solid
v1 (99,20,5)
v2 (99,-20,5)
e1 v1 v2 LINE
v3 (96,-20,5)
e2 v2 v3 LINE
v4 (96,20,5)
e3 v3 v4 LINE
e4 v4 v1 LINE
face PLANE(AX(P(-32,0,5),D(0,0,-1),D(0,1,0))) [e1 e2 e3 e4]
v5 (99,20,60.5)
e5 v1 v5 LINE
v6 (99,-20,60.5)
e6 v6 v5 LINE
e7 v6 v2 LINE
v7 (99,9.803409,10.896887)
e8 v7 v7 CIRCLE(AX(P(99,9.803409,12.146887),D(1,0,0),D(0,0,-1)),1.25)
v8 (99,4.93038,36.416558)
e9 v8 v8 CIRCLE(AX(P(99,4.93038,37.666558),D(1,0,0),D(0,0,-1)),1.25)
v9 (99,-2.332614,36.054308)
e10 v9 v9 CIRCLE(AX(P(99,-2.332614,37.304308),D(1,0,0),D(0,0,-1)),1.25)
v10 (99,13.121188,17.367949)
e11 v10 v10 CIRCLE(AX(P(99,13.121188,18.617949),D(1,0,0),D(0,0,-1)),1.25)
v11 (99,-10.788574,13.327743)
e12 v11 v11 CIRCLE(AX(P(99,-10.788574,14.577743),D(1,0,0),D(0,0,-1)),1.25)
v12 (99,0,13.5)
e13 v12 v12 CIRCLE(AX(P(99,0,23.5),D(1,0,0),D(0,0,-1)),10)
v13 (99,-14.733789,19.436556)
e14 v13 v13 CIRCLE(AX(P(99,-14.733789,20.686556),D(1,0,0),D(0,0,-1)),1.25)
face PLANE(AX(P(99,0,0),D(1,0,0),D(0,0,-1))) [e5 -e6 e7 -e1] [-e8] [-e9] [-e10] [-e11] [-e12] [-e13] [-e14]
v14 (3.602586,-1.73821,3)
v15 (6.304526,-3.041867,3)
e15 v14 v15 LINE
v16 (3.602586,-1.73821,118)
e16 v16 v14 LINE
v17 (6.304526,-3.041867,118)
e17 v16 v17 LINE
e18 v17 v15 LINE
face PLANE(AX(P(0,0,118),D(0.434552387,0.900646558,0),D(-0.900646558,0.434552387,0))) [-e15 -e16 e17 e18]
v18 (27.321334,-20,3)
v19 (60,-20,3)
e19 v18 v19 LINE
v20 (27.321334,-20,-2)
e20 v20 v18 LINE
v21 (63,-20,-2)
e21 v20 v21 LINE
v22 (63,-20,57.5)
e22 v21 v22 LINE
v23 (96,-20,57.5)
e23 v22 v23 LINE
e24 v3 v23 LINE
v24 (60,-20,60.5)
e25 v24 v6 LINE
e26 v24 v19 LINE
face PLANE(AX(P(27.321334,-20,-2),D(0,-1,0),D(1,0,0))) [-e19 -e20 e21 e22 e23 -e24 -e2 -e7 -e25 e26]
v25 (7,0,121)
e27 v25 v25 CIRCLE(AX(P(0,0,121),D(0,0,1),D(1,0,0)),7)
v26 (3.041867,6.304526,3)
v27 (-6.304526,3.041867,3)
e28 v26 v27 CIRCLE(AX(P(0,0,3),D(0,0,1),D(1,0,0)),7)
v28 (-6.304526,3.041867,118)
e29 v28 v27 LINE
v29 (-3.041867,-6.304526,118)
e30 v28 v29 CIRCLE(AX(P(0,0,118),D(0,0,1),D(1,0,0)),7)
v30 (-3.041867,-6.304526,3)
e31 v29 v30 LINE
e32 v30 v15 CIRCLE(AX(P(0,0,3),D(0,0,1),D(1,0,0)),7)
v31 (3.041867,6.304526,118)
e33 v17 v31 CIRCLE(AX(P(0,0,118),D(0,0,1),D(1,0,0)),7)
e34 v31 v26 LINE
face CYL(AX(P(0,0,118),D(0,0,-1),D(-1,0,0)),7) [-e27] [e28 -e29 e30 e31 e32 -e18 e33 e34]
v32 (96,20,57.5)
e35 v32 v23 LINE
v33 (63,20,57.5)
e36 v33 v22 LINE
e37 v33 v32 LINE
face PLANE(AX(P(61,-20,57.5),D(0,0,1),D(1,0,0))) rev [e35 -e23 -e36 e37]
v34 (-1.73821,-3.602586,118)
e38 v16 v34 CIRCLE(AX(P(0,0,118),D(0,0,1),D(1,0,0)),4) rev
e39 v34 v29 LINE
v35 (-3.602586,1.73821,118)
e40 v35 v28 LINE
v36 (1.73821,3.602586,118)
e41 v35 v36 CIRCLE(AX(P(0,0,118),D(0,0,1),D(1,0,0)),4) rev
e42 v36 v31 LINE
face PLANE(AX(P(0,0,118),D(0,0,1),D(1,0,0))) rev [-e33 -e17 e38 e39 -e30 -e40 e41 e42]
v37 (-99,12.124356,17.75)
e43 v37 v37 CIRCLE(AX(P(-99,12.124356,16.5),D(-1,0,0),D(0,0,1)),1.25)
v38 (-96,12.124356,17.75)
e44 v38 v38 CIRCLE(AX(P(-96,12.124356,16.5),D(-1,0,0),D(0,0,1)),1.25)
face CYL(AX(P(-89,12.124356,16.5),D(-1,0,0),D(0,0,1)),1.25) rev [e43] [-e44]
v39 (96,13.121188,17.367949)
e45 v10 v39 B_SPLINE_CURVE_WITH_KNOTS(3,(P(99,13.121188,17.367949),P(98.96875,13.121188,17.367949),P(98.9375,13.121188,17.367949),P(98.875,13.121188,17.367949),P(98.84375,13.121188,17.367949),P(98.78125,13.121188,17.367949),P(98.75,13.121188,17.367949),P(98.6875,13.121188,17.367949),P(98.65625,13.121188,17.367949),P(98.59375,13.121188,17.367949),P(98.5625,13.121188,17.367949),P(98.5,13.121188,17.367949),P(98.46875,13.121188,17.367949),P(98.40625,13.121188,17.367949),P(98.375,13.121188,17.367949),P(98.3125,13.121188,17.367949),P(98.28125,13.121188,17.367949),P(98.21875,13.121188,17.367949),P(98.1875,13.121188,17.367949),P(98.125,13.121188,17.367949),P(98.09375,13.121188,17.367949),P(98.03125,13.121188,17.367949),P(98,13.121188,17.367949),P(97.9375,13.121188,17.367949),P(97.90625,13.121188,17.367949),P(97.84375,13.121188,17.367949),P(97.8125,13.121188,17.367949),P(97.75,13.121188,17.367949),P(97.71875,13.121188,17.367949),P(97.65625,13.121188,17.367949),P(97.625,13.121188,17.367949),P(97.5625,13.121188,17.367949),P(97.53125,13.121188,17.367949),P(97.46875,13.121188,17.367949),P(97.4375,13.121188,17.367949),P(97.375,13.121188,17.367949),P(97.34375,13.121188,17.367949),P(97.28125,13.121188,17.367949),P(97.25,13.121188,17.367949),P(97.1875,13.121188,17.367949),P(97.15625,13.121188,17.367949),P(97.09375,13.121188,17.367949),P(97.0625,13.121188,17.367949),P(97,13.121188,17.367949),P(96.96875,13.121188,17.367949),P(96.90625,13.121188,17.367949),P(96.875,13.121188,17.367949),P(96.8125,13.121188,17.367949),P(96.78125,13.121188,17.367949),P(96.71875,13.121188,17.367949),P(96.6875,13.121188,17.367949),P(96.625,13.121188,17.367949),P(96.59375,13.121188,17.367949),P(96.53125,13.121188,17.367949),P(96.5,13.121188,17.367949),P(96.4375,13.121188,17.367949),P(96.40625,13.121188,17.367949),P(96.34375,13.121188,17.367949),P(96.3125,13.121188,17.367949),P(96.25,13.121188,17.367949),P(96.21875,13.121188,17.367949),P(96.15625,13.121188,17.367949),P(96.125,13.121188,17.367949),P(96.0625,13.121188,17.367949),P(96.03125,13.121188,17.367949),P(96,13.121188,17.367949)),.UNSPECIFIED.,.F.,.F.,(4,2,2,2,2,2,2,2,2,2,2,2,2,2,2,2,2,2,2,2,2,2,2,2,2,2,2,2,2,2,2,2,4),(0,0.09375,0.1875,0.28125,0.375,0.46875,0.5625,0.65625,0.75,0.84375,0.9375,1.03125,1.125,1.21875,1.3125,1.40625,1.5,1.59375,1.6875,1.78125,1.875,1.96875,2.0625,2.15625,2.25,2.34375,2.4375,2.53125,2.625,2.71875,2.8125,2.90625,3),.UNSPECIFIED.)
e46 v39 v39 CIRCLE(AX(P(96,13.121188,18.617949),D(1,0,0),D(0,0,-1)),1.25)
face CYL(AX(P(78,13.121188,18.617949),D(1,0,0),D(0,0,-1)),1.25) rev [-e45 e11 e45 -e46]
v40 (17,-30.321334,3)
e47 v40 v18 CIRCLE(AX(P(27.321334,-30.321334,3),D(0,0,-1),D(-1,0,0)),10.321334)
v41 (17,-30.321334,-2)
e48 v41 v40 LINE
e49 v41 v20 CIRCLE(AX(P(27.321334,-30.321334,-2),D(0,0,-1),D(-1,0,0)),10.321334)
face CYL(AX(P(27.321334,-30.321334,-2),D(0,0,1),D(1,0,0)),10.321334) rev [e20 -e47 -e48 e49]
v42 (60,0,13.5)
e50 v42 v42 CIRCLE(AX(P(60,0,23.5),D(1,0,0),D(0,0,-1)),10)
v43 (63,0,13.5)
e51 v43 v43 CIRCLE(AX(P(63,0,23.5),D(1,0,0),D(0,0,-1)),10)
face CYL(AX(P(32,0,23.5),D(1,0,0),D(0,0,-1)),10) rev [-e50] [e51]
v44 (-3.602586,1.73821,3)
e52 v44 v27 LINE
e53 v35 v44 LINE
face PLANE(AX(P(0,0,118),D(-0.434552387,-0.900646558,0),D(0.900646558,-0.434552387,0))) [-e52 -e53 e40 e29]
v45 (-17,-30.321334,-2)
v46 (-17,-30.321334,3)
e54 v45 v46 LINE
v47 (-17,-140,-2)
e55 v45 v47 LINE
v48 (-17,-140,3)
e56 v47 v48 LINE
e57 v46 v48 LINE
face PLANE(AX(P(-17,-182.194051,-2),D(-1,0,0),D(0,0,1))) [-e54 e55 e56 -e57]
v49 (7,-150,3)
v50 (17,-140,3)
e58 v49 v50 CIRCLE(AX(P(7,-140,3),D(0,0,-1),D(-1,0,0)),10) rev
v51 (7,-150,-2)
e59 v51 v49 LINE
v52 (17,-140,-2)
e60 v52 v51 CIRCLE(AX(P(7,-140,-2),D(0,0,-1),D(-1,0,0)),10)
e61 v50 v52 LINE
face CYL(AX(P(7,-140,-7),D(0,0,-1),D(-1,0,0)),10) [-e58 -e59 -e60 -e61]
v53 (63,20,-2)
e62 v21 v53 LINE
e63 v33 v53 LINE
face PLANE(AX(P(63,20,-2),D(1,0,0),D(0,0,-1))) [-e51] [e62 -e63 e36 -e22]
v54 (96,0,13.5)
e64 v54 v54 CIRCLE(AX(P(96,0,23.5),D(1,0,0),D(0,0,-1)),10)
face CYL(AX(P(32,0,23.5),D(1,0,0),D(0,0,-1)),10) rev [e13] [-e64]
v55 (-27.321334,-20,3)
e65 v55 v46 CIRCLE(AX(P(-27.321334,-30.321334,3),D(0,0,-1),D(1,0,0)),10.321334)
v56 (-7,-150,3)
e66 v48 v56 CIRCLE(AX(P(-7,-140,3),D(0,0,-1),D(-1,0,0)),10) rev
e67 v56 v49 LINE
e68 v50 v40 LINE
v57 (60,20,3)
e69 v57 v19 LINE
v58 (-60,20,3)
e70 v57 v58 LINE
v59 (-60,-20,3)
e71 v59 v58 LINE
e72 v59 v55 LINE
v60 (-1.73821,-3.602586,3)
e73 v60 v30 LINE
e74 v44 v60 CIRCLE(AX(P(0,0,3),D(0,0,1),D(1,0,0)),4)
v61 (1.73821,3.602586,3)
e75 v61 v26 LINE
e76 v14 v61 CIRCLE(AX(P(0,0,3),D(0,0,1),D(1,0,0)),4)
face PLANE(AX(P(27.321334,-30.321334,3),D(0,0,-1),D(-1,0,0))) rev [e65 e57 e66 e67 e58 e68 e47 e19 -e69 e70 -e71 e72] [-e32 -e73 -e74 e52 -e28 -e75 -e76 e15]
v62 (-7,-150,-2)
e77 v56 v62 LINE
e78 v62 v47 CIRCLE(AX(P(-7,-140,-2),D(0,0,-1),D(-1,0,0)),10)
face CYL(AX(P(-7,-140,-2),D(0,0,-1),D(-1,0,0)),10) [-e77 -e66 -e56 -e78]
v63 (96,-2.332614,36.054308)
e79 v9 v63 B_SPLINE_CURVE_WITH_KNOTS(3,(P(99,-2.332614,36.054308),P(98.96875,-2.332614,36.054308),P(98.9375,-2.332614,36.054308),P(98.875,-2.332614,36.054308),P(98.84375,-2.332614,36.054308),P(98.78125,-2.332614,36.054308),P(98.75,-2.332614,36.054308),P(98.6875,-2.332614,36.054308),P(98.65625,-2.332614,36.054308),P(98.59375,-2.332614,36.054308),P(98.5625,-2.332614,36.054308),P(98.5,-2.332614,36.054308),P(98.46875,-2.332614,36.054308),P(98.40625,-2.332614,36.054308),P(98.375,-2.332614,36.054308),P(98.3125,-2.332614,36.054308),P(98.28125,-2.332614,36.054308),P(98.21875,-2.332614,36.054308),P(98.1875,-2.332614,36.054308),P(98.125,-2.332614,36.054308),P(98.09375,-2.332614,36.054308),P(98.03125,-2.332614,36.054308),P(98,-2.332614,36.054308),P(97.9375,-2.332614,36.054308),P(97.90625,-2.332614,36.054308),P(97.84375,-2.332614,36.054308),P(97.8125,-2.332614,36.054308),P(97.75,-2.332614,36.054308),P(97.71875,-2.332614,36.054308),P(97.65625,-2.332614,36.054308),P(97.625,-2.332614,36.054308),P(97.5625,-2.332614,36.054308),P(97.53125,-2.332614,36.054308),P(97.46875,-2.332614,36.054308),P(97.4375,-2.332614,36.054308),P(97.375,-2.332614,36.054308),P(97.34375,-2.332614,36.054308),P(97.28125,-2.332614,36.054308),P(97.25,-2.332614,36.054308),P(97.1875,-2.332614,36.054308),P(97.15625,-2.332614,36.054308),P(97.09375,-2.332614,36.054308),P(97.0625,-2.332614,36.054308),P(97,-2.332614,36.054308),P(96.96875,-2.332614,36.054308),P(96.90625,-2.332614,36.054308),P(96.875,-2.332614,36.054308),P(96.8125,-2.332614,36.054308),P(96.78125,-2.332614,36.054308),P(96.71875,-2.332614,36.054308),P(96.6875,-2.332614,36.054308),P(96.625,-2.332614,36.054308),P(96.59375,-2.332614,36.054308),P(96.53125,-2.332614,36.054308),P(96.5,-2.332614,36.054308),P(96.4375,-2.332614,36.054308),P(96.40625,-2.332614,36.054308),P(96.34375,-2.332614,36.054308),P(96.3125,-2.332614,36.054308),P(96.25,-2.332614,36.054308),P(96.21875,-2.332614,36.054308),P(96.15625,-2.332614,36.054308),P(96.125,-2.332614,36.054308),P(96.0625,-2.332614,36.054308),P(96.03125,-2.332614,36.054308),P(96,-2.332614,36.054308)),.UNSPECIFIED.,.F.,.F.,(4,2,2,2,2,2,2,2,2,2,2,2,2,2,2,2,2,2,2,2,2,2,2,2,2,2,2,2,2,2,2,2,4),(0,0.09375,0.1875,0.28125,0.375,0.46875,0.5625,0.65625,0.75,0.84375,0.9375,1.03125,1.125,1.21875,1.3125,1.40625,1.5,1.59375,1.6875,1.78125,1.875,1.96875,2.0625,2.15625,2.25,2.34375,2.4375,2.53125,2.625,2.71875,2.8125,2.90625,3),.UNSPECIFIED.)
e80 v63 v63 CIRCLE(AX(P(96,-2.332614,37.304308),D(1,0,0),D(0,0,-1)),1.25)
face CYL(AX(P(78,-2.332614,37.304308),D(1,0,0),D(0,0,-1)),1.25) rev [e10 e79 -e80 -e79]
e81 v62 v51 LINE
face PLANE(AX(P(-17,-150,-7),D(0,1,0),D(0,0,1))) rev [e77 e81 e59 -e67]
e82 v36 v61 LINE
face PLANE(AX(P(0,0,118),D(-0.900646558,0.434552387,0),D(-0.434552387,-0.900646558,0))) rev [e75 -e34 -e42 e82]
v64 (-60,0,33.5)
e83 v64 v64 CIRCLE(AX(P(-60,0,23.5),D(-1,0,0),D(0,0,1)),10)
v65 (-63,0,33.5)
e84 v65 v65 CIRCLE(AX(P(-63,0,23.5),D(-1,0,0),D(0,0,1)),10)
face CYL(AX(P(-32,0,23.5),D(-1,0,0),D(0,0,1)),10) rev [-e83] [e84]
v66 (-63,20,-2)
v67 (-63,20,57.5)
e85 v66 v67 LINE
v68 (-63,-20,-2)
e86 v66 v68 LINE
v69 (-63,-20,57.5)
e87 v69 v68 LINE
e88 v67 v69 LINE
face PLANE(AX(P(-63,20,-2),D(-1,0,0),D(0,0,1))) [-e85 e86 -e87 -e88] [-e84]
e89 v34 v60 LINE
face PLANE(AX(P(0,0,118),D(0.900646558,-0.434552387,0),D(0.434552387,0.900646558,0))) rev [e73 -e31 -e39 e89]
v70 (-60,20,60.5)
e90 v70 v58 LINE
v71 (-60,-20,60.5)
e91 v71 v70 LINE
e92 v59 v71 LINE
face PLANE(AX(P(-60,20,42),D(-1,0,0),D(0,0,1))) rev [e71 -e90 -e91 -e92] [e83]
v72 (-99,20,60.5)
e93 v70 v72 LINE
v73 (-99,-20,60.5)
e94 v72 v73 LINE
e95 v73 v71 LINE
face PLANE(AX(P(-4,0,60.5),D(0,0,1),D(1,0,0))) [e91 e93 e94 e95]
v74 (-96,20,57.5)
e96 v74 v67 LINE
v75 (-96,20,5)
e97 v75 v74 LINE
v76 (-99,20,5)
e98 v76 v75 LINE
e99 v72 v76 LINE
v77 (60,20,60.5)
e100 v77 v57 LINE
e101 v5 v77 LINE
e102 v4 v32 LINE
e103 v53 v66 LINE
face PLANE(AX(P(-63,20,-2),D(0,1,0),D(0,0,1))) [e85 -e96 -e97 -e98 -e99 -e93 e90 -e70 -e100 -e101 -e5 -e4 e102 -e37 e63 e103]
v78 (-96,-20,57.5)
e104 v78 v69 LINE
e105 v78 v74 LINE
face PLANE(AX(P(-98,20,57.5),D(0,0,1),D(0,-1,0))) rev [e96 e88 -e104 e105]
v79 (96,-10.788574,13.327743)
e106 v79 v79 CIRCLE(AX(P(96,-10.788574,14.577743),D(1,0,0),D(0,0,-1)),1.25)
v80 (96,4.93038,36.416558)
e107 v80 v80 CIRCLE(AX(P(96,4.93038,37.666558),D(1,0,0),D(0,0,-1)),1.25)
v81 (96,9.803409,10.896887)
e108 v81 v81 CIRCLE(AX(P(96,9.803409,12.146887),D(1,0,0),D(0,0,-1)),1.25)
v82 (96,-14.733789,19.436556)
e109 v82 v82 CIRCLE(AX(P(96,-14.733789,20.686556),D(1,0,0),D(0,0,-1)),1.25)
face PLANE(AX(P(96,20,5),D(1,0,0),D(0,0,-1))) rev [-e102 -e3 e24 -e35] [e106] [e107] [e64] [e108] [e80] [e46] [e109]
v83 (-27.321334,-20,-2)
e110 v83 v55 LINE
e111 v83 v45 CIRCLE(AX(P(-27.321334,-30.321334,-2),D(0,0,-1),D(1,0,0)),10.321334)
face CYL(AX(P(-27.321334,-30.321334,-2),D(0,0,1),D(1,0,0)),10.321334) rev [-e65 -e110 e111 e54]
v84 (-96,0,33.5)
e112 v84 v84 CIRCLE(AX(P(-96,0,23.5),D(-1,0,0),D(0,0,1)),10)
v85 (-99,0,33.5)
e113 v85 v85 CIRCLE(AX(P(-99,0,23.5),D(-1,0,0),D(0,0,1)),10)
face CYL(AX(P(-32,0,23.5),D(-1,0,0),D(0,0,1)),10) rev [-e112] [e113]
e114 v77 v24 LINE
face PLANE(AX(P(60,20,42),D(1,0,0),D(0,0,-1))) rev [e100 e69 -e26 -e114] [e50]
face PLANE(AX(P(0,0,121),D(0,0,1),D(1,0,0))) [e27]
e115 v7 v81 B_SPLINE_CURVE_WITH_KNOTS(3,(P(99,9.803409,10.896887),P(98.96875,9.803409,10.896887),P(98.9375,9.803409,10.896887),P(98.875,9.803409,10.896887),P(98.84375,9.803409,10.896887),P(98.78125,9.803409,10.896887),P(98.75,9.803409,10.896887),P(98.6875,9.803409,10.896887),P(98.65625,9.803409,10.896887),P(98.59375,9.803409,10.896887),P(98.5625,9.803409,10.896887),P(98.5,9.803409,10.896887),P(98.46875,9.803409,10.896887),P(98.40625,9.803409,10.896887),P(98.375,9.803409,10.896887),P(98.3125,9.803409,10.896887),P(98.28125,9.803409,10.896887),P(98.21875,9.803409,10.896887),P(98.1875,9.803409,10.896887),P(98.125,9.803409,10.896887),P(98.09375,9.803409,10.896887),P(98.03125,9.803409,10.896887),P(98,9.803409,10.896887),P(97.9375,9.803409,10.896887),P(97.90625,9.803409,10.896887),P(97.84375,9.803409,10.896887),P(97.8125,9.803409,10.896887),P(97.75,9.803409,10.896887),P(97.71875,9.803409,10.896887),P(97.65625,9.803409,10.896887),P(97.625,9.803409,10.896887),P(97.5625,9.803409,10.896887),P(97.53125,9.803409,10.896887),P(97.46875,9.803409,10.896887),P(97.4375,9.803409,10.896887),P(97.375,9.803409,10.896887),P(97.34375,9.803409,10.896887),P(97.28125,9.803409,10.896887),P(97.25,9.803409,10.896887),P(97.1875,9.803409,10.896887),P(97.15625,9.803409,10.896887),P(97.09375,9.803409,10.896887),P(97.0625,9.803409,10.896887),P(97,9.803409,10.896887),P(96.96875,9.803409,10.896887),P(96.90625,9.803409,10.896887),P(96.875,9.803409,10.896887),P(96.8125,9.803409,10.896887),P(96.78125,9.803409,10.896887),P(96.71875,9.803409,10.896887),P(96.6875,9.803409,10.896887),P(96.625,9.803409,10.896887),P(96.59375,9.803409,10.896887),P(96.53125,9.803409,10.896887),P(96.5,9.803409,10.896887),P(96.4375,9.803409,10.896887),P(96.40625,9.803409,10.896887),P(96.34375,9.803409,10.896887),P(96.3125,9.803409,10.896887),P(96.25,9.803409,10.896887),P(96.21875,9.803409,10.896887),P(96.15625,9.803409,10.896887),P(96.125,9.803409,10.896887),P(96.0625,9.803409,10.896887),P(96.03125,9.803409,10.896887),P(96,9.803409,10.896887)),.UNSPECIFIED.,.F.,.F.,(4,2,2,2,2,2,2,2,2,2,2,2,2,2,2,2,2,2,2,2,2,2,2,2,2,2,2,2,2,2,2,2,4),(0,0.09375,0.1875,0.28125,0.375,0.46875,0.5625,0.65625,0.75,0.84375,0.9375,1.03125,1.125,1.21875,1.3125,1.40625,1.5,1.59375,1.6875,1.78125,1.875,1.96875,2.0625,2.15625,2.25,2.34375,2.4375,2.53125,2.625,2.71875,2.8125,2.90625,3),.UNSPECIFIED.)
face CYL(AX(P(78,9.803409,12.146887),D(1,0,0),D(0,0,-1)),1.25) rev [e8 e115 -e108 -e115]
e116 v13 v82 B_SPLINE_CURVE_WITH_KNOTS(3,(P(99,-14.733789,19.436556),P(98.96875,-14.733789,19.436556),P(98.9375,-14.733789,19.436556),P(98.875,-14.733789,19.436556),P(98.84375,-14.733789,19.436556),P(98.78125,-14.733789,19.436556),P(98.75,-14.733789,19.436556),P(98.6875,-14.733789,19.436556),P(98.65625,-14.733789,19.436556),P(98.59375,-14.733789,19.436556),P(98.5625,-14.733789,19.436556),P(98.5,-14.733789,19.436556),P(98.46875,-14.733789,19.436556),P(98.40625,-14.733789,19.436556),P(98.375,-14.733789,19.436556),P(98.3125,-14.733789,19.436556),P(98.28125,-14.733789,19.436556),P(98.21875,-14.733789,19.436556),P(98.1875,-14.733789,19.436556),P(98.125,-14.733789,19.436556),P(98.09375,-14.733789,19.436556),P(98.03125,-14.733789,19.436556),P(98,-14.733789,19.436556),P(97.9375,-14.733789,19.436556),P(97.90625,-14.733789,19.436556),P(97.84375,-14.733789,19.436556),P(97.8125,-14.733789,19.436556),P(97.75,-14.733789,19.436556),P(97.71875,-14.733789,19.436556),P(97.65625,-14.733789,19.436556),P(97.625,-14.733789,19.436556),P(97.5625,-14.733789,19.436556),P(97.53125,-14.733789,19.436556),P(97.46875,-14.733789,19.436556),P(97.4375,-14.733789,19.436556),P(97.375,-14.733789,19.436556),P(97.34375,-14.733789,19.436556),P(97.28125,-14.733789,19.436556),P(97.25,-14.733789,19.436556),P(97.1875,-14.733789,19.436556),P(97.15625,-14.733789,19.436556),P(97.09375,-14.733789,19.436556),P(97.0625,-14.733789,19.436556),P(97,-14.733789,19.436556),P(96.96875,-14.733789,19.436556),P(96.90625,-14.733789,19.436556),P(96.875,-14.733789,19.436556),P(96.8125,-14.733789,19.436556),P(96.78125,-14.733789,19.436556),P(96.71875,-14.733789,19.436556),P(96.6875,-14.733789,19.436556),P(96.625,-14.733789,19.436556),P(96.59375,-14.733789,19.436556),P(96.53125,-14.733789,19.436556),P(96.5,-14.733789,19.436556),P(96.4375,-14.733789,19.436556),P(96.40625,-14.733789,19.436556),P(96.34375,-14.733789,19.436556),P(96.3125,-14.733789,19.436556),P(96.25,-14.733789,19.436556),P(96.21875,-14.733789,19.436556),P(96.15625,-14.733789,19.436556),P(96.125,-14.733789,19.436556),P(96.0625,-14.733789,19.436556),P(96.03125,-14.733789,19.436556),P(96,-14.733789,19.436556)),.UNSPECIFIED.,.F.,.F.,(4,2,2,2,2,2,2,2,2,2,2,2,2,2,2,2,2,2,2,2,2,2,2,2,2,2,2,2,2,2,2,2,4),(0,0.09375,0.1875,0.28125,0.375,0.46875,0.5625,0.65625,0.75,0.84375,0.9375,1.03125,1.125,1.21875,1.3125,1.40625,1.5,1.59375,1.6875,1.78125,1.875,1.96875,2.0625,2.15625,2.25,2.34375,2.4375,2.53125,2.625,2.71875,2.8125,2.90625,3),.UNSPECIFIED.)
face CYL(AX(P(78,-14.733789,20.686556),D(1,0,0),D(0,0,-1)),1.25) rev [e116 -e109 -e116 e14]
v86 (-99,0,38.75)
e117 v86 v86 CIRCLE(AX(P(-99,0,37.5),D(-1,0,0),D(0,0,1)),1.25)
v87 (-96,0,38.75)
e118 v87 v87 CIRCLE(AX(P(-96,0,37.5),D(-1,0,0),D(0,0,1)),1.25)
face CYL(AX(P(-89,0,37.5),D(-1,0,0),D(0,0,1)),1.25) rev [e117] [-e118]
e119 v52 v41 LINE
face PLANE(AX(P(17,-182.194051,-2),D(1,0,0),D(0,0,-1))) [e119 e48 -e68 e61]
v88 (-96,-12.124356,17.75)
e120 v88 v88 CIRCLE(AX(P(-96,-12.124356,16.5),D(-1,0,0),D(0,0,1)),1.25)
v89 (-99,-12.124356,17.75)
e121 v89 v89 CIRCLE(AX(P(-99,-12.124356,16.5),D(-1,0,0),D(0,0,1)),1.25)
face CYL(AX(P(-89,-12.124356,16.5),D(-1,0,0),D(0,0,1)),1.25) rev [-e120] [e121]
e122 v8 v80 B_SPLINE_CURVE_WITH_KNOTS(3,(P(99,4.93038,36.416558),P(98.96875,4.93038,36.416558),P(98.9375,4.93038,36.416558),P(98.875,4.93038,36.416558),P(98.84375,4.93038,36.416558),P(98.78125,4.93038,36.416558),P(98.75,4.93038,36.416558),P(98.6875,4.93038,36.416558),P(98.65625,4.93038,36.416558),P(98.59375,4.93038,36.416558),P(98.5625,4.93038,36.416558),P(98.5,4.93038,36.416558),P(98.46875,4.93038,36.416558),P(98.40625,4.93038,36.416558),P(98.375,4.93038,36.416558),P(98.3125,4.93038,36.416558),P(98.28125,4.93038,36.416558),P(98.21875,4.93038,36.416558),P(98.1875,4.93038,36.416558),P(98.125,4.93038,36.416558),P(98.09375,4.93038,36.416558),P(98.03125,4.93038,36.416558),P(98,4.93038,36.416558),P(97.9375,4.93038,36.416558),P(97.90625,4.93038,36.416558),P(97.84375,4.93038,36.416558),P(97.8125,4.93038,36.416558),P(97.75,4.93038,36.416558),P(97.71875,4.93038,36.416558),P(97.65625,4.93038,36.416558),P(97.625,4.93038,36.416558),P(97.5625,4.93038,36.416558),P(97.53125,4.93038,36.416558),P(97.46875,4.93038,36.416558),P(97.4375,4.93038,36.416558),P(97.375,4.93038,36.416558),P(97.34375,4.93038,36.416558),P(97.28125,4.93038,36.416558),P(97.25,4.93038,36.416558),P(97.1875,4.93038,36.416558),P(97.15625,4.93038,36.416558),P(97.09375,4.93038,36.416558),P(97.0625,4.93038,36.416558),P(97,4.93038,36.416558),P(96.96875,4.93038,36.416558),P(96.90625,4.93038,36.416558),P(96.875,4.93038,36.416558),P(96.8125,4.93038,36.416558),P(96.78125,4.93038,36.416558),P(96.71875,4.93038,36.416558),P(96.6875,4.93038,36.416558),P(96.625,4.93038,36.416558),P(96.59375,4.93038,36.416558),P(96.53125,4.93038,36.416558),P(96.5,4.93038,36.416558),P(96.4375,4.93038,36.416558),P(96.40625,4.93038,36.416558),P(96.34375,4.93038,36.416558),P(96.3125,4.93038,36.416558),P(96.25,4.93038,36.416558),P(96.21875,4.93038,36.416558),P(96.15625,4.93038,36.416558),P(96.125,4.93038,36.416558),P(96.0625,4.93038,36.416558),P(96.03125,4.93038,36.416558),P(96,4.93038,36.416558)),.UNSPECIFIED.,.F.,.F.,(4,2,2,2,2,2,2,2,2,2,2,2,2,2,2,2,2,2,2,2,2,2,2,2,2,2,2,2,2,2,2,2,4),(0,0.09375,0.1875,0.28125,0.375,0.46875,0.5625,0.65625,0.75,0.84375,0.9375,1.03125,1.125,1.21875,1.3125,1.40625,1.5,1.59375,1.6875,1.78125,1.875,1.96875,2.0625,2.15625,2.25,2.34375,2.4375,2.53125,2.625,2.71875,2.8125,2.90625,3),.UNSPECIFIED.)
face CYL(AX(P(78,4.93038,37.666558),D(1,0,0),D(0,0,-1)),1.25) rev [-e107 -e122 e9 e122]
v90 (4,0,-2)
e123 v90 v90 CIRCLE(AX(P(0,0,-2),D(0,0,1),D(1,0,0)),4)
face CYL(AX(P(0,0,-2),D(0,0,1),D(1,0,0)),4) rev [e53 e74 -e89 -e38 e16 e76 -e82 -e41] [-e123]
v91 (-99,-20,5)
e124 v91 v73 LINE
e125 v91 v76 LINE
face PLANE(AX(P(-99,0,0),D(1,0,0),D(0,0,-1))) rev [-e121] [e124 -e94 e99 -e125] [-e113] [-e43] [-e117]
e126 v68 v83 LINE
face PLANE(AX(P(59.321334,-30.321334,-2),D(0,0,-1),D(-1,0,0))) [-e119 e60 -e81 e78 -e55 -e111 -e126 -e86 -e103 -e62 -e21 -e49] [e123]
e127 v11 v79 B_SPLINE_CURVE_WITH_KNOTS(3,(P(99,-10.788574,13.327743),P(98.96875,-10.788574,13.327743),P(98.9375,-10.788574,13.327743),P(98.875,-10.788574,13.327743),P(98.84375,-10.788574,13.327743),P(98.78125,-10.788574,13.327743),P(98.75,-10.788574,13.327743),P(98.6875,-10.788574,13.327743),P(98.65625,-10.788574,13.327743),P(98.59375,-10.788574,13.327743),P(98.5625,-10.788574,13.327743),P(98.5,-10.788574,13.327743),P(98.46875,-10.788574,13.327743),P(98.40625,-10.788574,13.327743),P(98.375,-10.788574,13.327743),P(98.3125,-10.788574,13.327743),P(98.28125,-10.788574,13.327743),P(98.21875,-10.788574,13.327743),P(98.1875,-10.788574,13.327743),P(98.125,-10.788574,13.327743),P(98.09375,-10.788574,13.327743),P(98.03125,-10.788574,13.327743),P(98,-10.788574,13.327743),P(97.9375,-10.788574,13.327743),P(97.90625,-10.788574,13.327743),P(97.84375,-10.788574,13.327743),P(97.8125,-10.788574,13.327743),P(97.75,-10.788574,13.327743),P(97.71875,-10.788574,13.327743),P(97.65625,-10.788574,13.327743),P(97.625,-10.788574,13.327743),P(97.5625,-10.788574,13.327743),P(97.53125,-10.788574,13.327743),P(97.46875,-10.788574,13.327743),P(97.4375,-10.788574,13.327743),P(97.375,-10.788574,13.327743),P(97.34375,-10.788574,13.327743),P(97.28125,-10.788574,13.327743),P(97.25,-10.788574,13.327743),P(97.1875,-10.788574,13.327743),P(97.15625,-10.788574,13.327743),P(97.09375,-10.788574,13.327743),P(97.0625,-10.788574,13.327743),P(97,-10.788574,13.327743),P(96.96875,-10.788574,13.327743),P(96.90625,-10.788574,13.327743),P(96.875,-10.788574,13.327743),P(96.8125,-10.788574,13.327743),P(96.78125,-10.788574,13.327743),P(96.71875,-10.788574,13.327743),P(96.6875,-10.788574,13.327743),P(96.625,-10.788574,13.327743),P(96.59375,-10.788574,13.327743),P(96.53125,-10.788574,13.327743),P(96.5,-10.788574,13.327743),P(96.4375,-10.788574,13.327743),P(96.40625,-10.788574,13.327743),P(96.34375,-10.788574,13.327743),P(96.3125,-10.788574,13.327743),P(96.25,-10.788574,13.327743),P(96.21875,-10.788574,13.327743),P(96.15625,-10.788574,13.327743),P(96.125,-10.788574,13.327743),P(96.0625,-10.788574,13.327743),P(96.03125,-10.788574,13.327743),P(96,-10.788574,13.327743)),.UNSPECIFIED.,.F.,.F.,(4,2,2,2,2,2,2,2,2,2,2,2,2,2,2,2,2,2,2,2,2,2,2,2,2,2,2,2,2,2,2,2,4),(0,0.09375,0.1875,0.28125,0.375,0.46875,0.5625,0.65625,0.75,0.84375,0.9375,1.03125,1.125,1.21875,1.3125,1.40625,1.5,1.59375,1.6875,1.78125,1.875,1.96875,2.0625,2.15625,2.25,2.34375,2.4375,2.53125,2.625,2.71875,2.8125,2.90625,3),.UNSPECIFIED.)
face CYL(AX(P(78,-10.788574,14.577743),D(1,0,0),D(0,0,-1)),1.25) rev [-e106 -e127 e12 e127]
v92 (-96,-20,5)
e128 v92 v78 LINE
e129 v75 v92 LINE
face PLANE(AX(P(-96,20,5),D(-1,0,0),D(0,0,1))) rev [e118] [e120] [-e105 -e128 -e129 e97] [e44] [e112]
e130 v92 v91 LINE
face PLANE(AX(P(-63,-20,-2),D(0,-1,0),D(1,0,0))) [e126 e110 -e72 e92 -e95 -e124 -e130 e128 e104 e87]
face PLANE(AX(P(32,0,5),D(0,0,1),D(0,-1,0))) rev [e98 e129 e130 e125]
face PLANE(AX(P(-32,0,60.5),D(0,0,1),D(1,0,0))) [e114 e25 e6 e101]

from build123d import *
from build123d.topology import SkipClean

# Parameters (mm, degrees)
BOSS_EXTRUDE2_DEPTH      = 3
BOSS_EXTRUDE2_DEPTH_BACK = 2
SKETCH2_W                = 3
SKETCH2_H                = 40
BOSS_EXTRUDE4_DEPTH      = 39
SKETCH3_W                = 1
SKETCH3_H                = 40
BOSS_EXTRUDE5_DEPTH      = 36
SKETCH4_W                = 1
SKETCH4_H                = 40
BOSS_EXTRUDE6_DEPTH      = 36
SKETCH5_W                = 3
SKETCH5_H                = 40
BOSS_EXTRUDE7_DEPTH      = 36
SKETCH6_R                = 4
CUT_EXTRUDE1_DEPTH       = 228.764510235
CUT_EXTRUDE2_DEPTH       = 36
BOSS_EXTRUDE10_START     = 115
BOSS_EXTRUDE10_DEPTH     = 115
BOSS_EXTRUDE11_START     = 3
SKETCH11_R               = 7
BOSS_EXTRUDE11_DEPTH     = 3
SKETCH12_R               = 10
CUT_EXTRUDE4_DEPTH       = 67
CUT_EXTRUDE5_START       = -67
SKETCH13_R               = 10
CUT_EXTRUDE5_DEPTH       = 67
SKETCH15_W               = 39
SKETCH15_H               = 40
BOSS_EXTRUDE12_DEPTH     = 2
SKETCH16_W               = 33
SKETCH16_H               = 40
CUT_EXTRUDE6_DEPTH       = 52
SKETCH17_W               = 33
SKETCH17_H               = 40
CUT_EXTRUDE7_DEPTH       = 52
SKETCH18_W               = 3
SKETCH18_H               = 40
BOSS_EXTRUDE13_DEPTH     = 16.5
LPATTERN1_COUNT          = 2
LPATTERN1_PITCH          = 36
SKETCH19_W               = 3
SKETCH19_H               = 40
BOSS_EXTRUDE14_DEPTH     = 16.5
LPATTERN2_COUNT          = 2
LPATTERN2_PITCH          = 36
SKETCH21_W               = 3
SKETCH21_H               = 40
BOSS_EXTRUDE16_DEPTH     = 35
SKETCH22_W               = 3
SKETCH22_H               = 40
BOSS_EXTRUDE17_DEPTH     = 35
SKETCH27_R               = 1.25
CUT_EXTRUDE16_DEPTH      = 21
SKETCH29_W               = 32
SKETCH29_H               = 40
CUT_EXTRUDE19_DEPTH      = 10
SKETCH30_W               = 34.030572501
SKETCH30_H               = 34.181917291
CUT_EXTRUDE20_DEPTH      = 10
FILLET1_R                = 10
SKETCH31_R               = 1.25
CUT_EXTRUDE21_DEPTH      = 10


with BuildPart() as part:
    # Sketch1 → Boss-Extrude2 (new, two sides: drawn at the far end of the back side and taken through both)
    with BuildSketch(Plane.XY.offset(-BOSS_EXTRUDE2_DEPTH_BACK)):
        with BuildLine():
            Line((-95, 20), (95, 20))
            Line((95, 20), (95, -20))
            Line((95, -20), (27.321334375, -20))
            ThreePointArc((27.321334375, -20), (20.023048847, -23.023048847), (17, -30.321334375))
            Line((17, -30.321334375), (17, -182.194050733))
            Line((17, -182.194050733), (-17, -182.194050733))
            Line((-17, -182.194050733), (-17, -30.321334375))
            ThreePointArc((-17, -30.321334375), (-20.023048847, -23.023048847), (-27.321334375, -20))
            Line((-27.321334375, -20), (-95, -20))
            Line((-95, -20), (-95, 20))
        make_face()
    extrude(amount=BOSS_EXTRUDE2_DEPTH + BOSS_EXTRUDE2_DEPTH_BACK)

    # Sketch2 → Boss-Extrude4 (add)
    with BuildSketch(Plane.XY.offset(3)):
        with Locations((-93.5, 0)):
            Rectangle(SKETCH2_W, SKETCH2_H)
        with Locations((93.5, 0)):
            Rectangle(SKETCH2_W, SKETCH2_H)
    extrude(amount=BOSS_EXTRUDE4_DEPTH)

    # Sketch3 → Boss-Extrude5 (add)
    with BuildSketch(Plane.ZY.offset(95)):
        with Locations((41.5, 0)):
            Rectangle(SKETCH3_W, SKETCH3_H)
    extrude(amount=BOSS_EXTRUDE5_DEPTH)

    # Sketch4 → Boss-Extrude6 (add)
    with BuildSketch(Plane(origin=(95, 0, 0), x_dir=(0, 0, -1), z_dir=(1, 0, 0))):
        with Locations((-41.5, 0)):
            Rectangle(SKETCH4_W, SKETCH4_H)
    extrude(amount=BOSS_EXTRUDE6_DEPTH)

    # Sketch5 → Boss-Extrude7 (add)
    with BuildSketch(Plane(origin=(0, 0, 41), x_dir=(-1, 0, 0), z_dir=(0, 0, -1))):
        with Locations((-129.5, 0)):
            Rectangle(SKETCH5_W, SKETCH5_H)
        with Locations((129.5, 0)):
            Rectangle(SKETCH5_W, SKETCH5_H)
    extrude(amount=BOSS_EXTRUDE7_DEPTH)

    # Sketch6 → Cut-Extrude1 (cut, through all)
    with BuildSketch(Plane.XY.offset(3)):
        Circle(SKETCH6_R)
    extrude(amount=-CUT_EXTRUDE1_DEPTH, mode=Mode.SUBTRACT)

    # Sketch7 → Cut-Extrude2 (cut)
    with BuildSketch(Plane.XY.offset(3)):
        with BuildLine():
            Line((-17, -182.194050733), (0, -182.194050733))
            ThreePointArc((0, -182.194050733), (-12.02081528, -177.214866013), (-17, -165.194050733))
            Line((-17, -165.194050733), (-17, -182.194050733))
        make_face()
        with BuildLine():
            ThreePointArc((17, -165.194050733), (12.02081528, -177.214866013), (0, -182.194050733))
            Line((0, -182.194050733), (17, -182.194050733))
            Line((17, -182.194050733), (17, -165.194050733))
        make_face()
    extrude(amount=-CUT_EXTRUDE2_DEPTH, mode=Mode.SUBTRACT)

    # Sketch8 → Boss-Extrude10 (add)
    with SkipClean():  # the faces are left unmerged after this step: merging them gives an invalid solid
        with BuildSketch(Plane.XY.offset(3).offset(BOSS_EXTRUDE10_START)):
            with BuildLine():
                Line((-6.304525909, 3.041866706), (-3.602586234, 1.738209546))
                ThreePointArc((-3.602586234, 1.738209546), (-1.318313398, 3.776512913), (1.738209546, 3.602586234))
                Line((1.738209546, 3.602586234), (3.041866706, 6.304525909))
                ThreePointArc((3.041866706, 6.304525909), (-2.307048447, 6.608897598), (-6.304525909, 3.041866706))
            make_face()
            with BuildLine():
                Line((6.304525909, -3.041866706), (3.602586234, -1.738209546))
                ThreePointArc((3.602586234, -1.738209546), (1.318313398, -3.776512913), (-1.738209546, -3.602586234))
                Line((-1.738209546, -3.602586234), (-3.041866706, -6.304525909))
                ThreePointArc((-3.041866706, -6.304525909), (2.307048447, -6.608897598), (6.304525909, -3.041866706))
            make_face()
        extrude(amount=-BOSS_EXTRUDE10_DEPTH)

    # Sketch11 → Boss-Extrude11 (add)
    with SkipClean():  # the faces are left unmerged after this step: merging them gives an invalid solid
        with BuildSketch(Plane.XY.offset(118).offset(BOSS_EXTRUDE11_START)):
            with Locations(Location((0, 0, 0), (0, 0, 154.243185034))):
                Circle(SKETCH11_R)
        extrude(amount=-BOSS_EXTRUDE11_DEPTH)

    # Sketch12 → Cut-Extrude4 (cut)
    with SkipClean():  # the faces are left unmerged after this step: merging them gives an invalid solid
        with BuildSketch(Plane(origin=(131, 0, 0), x_dir=(0, 0, -1), z_dir=(1, 0, 0))):
            with Locations((-23.5, 0)):
                Circle(SKETCH12_R)
        extrude(amount=-CUT_EXTRUDE4_DEPTH, mode=Mode.SUBTRACT)

    # Sketch13 → Cut-Extrude5 (cut)
    with SkipClean():  # the faces are left unmerged after this step: merging them gives an invalid solid
        with BuildSketch(Plane.ZY.offset(131).offset(CUT_EXTRUDE5_START)):
            with Locations(Location((23.5, 0, 0), (0, 0, 180))):
                Circle(SKETCH13_R)
        extrude(amount=CUT_EXTRUDE5_DEPTH, mode=Mode.SUBTRACT)

    # Sketch15 → Boss-Extrude12 (add)
    with SkipClean():  # the faces are left unmerged after this step: merging them gives an invalid solid
        with BuildSketch(Plane.XY.offset(42)):
            with Locations((-111.5, 0)):
                Rectangle(SKETCH15_W, SKETCH15_H)
        boss_extrude12 = extrude(amount=BOSS_EXTRUDE12_DEPTH)

    # Mirror1: Boss-Extrude12 across plane
    with SkipClean():  # the faces are left unmerged after this step: merging them gives an invalid solid
        add(boss_extrude12.mirror(Plane(origin=(0, 0, 0), x_dir=(0, 0, 1), z_dir=(1, 0, 0))))

    # Sketch16 → Cut-Extrude6 (cut)
    with SkipClean():  # the faces are left unmerged after this step: merging them gives an invalid solid
        with BuildSketch(Plane(origin=(0, 0, 41), x_dir=(-1, 0, 0), z_dir=(0, 0, -1))):
            with Locations((111.5, 0)):
                Rectangle(SKETCH16_W, SKETCH16_H)
        extrude(amount=-CUT_EXTRUDE6_DEPTH, mode=Mode.SUBTRACT)


with BuildPart() as cut_extrude6_piece_1:
    # of the separate pieces the step leaves, piece 1, a body of its own (cut_extrude6_pieces)
    add(part.part.solids().sort_by_distance((-92, 20, 3))[0])

    # Sketch17 → Cut-Extrude7 (cut)
    with SkipClean():  # the faces are left unmerged after this step: merging them gives an invalid solid
        with BuildSketch(Plane(origin=(0, 0, 41), x_dir=(-1, 0, 0), z_dir=(0, 0, -1))):
            with Locations((-111.5, 0)):
                Rectangle(SKETCH17_W, SKETCH17_H)
        extrude(amount=-CUT_EXTRUDE7_DEPTH, mode=Mode.SUBTRACT)


with BuildPart() as cut_extrude6_piece_2:
    # of the separate pieces the step leaves, piece 2, a body of its own (cut_extrude6_pieces)
    add(part.part.solids().sort_by_distance((-131, 20, 42))[0])


with BuildPart() as cut_extrude7_piece_1:
    # of the separate pieces the step leaves, piece 1, a body of its own (cut_extrude7_pieces)
    add(cut_extrude6_piece_1.part.solids().sort_by_distance((-92, 20, 3))[0])

    # Sketch18 → Boss-Extrude13 (add)
    with SkipClean():  # the faces are left unmerged after this step: merging them gives an invalid solid
        with BuildSketch(Plane.XY.offset(44)):
            with Locations((-93.5, 0)):
                Rectangle(SKETCH18_W, SKETCH18_H)
        boss_extrude13 = extrude(amount=BOSS_EXTRUDE13_DEPTH)

    # Sketch19 → Boss-Extrude14 (add)
    with SkipClean():  # the faces are left unmerged after this step: merging them gives an invalid solid
        with BuildSketch(Plane.XY.offset(44)):
            with Locations((93.5, 0)):
                Rectangle(SKETCH19_W, SKETCH19_H)
        boss_extrude14 = extrude(amount=BOSS_EXTRUDE14_DEPTH)



with BuildPart() as cut_extrude7_piece_2:
    # of the separate pieces the step leaves, piece 2, a body of its own (cut_extrude7_pieces)
    add(cut_extrude6_piece_1.part.solids().sort_by_distance((128, 20, 41))[0])

    # LPattern2: Boss-Extrude14 ×2
    with Locations(*[(i * LPATTERN2_PITCH, 0, 0) for i in range(1, LPATTERN2_COUNT)]):
        add(boss_extrude14)


with BuildPart() as cut_extrude6_piece_2_1:
    add(cut_extrude6_piece_2.part)

    # LPattern1: Boss-Extrude13 ×2
    with Locations(*[(-i * LPATTERN1_PITCH, 0, 0) for i in range(1, LPATTERN1_COUNT)]):
        add(boss_extrude13)



with BuildPart() as cut_extrude7_piece_1_1:
    with SkipClean():  # the faces are left unmerged after this step: merging them gives an invalid solid
        add(cut_extrude7_piece_1.part)

        add(cut_extrude7_piece_2.part)  # Boss-Extrude16 merges Cut-Extrude7 piece 2
        # Sketch21 → Boss-Extrude16 (add)
        with BuildSketch(Plane.ZY.offset(-128)):
            with Locations((59, 0)):
                Rectangle(SKETCH21_W, SKETCH21_H)
        extrude(amount=BOSS_EXTRUDE16_DEPTH)


with BuildPart() as cut_extrude6_piece_2_2:
    with SkipClean():  # the faces are left unmerged after this step: merging them gives an invalid solid
        add(cut_extrude6_piece_2_1.part)

        add(cut_extrude7_piece_1_1.part)  # Boss-Extrude17 merges Cut-Extrude7 piece 1
        # Sketch22 → Boss-Extrude17 (add)
        with BuildSketch(Plane.ZY.offset(95)):
            with Locations((59, 0)):
                Rectangle(SKETCH22_W, SKETCH22_H)
        extrude(amount=BOSS_EXTRUDE17_DEPTH)

    # Sketch27 → Cut-Extrude16 (cut)
    with SkipClean():  # the faces are left unmerged after this step: merging them gives an invalid solid
        with BuildSketch(Plane(origin=(131, 0, 0), x_dir=(0, 0, -1), z_dir=(1, 0, 0))):
            with Locations((-37.304307679, -2.332614308)):
                Circle(SKETCH27_R)
            with Locations((-18.617949409, 13.121188286)):
                Circle(SKETCH27_R)
            with Locations((-14.577742912, -10.788573977)):
                Circle(SKETCH27_R)
            with Locations((-20.686555586, -14.733788736)):
                Circle(SKETCH27_R)
            with Locations((-12.146886867, 9.803408703)):
                Circle(SKETCH27_R)
            with Locations((-37.666557547, 4.930380034)):
                Circle(SKETCH27_R)
        extrude(amount=-CUT_EXTRUDE16_DEPTH, mode=Mode.SUBTRACT)

    # Sketch29 → Cut-Extrude19 (cut)
    with SkipClean():  # the faces are left unmerged after this step: merging them gives an invalid solid
        with BuildSketch(Plane.XY.offset(3)):
            with Locations((76, 0)):
                Rectangle(SKETCH29_W, SKETCH29_H)
            with Locations((-76, 0)):
                Rectangle(SKETCH29_W, SKETCH29_H)
        extrude(amount=-CUT_EXTRUDE19_DEPTH, mode=Mode.SUBTRACT)


with BuildPart() as cut_extrude19_piece_1:
    # of the separate pieces the step leaves, piece 1, a body of its own (cut_extrude19_pieces)
    add(cut_extrude6_piece_2_2.part.solids().sort_by_distance((-60, 20, 3))[0])


with BuildPart() as cut_extrude19_piece_2:
    # of the separate pieces the step leaves, piece 2, a body of its own (cut_extrude19_pieces)
    add(cut_extrude6_piece_2_2.part.solids().sort_by_distance((-92, 20, 3))[0])


with BuildPart() as cut_extrude19_piece_3:
    # of the separate pieces the step leaves, piece 3, a body of its own (cut_extrude19_pieces)
    add(cut_extrude6_piece_2_2.part.solids().sort_by_distance((131, 20, 60.5))[0])


with BuildPart() as cut_extrude19_piece_2_1:
    # Body-Move/Copy3: read off the stored shape, not the designer's step
    # Body-Move/Copy3: moved
    add(cut_extrude19_piece_2.part.moved(Location((32, 0, 0))))


with BuildPart() as cut_extrude19_piece_3_1:
    # Body-Move/Copy4: read off the stored shape, not the designer's step
    # Body-Move/Copy4: moved
    add(cut_extrude19_piece_3.part.moved(Location((-32, 0, 0))))


with BuildPart() as cut_extrude19_piece_2_2:
    add(cut_extrude19_piece_2_1.part)

    # Combine2: union Cut-Extrude19 piece 1, Cut-Extrude19 piece 3
    add(cut_extrude19_piece_1.part)
    add(cut_extrude19_piece_3_1.part)

    # Sketch30 → Cut-Extrude20 (cut)
    with SkipClean():  # the faces are left unmerged after this step: merging them gives an invalid solid
        with BuildSketch(Plane.XY.offset(3)):
            with Locations((0.015286251, -167.090958645)):
                Rectangle(SKETCH30_W, SKETCH30_H)
        extrude(amount=-CUT_EXTRUDE20_DEPTH, mode=Mode.SUBTRACT)

    # Fillet1
    fillet1_edges = [cut_extrude19_piece_2_2.edges().sort_by_distance(p)[0] for p in [
        (17, -150, 0.5),
        (-17, -150, 0.5),
    ]]
    fillet(fillet1_edges, radius=FILLET1_R)

    # Sketch31 → Cut-Extrude21 (cut)
    with SkipClean():  # the faces are left unmerged after this step: merging them gives an invalid solid
        with BuildSketch(Plane.ZY.offset(99)):
            with Locations((37.5, 0)):
                Circle(SKETCH31_R)
            with Locations((16.5, -12.124355653)):
                Circle(SKETCH31_R)
            with Locations((16.5, 12.124355653)):
                Circle(SKETCH31_R)
        extrude(amount=-CUT_EXTRUDE21_DEPTH, mode=Mode.SUBTRACT)


solid = cut_extrude19_piece_2_2.part
